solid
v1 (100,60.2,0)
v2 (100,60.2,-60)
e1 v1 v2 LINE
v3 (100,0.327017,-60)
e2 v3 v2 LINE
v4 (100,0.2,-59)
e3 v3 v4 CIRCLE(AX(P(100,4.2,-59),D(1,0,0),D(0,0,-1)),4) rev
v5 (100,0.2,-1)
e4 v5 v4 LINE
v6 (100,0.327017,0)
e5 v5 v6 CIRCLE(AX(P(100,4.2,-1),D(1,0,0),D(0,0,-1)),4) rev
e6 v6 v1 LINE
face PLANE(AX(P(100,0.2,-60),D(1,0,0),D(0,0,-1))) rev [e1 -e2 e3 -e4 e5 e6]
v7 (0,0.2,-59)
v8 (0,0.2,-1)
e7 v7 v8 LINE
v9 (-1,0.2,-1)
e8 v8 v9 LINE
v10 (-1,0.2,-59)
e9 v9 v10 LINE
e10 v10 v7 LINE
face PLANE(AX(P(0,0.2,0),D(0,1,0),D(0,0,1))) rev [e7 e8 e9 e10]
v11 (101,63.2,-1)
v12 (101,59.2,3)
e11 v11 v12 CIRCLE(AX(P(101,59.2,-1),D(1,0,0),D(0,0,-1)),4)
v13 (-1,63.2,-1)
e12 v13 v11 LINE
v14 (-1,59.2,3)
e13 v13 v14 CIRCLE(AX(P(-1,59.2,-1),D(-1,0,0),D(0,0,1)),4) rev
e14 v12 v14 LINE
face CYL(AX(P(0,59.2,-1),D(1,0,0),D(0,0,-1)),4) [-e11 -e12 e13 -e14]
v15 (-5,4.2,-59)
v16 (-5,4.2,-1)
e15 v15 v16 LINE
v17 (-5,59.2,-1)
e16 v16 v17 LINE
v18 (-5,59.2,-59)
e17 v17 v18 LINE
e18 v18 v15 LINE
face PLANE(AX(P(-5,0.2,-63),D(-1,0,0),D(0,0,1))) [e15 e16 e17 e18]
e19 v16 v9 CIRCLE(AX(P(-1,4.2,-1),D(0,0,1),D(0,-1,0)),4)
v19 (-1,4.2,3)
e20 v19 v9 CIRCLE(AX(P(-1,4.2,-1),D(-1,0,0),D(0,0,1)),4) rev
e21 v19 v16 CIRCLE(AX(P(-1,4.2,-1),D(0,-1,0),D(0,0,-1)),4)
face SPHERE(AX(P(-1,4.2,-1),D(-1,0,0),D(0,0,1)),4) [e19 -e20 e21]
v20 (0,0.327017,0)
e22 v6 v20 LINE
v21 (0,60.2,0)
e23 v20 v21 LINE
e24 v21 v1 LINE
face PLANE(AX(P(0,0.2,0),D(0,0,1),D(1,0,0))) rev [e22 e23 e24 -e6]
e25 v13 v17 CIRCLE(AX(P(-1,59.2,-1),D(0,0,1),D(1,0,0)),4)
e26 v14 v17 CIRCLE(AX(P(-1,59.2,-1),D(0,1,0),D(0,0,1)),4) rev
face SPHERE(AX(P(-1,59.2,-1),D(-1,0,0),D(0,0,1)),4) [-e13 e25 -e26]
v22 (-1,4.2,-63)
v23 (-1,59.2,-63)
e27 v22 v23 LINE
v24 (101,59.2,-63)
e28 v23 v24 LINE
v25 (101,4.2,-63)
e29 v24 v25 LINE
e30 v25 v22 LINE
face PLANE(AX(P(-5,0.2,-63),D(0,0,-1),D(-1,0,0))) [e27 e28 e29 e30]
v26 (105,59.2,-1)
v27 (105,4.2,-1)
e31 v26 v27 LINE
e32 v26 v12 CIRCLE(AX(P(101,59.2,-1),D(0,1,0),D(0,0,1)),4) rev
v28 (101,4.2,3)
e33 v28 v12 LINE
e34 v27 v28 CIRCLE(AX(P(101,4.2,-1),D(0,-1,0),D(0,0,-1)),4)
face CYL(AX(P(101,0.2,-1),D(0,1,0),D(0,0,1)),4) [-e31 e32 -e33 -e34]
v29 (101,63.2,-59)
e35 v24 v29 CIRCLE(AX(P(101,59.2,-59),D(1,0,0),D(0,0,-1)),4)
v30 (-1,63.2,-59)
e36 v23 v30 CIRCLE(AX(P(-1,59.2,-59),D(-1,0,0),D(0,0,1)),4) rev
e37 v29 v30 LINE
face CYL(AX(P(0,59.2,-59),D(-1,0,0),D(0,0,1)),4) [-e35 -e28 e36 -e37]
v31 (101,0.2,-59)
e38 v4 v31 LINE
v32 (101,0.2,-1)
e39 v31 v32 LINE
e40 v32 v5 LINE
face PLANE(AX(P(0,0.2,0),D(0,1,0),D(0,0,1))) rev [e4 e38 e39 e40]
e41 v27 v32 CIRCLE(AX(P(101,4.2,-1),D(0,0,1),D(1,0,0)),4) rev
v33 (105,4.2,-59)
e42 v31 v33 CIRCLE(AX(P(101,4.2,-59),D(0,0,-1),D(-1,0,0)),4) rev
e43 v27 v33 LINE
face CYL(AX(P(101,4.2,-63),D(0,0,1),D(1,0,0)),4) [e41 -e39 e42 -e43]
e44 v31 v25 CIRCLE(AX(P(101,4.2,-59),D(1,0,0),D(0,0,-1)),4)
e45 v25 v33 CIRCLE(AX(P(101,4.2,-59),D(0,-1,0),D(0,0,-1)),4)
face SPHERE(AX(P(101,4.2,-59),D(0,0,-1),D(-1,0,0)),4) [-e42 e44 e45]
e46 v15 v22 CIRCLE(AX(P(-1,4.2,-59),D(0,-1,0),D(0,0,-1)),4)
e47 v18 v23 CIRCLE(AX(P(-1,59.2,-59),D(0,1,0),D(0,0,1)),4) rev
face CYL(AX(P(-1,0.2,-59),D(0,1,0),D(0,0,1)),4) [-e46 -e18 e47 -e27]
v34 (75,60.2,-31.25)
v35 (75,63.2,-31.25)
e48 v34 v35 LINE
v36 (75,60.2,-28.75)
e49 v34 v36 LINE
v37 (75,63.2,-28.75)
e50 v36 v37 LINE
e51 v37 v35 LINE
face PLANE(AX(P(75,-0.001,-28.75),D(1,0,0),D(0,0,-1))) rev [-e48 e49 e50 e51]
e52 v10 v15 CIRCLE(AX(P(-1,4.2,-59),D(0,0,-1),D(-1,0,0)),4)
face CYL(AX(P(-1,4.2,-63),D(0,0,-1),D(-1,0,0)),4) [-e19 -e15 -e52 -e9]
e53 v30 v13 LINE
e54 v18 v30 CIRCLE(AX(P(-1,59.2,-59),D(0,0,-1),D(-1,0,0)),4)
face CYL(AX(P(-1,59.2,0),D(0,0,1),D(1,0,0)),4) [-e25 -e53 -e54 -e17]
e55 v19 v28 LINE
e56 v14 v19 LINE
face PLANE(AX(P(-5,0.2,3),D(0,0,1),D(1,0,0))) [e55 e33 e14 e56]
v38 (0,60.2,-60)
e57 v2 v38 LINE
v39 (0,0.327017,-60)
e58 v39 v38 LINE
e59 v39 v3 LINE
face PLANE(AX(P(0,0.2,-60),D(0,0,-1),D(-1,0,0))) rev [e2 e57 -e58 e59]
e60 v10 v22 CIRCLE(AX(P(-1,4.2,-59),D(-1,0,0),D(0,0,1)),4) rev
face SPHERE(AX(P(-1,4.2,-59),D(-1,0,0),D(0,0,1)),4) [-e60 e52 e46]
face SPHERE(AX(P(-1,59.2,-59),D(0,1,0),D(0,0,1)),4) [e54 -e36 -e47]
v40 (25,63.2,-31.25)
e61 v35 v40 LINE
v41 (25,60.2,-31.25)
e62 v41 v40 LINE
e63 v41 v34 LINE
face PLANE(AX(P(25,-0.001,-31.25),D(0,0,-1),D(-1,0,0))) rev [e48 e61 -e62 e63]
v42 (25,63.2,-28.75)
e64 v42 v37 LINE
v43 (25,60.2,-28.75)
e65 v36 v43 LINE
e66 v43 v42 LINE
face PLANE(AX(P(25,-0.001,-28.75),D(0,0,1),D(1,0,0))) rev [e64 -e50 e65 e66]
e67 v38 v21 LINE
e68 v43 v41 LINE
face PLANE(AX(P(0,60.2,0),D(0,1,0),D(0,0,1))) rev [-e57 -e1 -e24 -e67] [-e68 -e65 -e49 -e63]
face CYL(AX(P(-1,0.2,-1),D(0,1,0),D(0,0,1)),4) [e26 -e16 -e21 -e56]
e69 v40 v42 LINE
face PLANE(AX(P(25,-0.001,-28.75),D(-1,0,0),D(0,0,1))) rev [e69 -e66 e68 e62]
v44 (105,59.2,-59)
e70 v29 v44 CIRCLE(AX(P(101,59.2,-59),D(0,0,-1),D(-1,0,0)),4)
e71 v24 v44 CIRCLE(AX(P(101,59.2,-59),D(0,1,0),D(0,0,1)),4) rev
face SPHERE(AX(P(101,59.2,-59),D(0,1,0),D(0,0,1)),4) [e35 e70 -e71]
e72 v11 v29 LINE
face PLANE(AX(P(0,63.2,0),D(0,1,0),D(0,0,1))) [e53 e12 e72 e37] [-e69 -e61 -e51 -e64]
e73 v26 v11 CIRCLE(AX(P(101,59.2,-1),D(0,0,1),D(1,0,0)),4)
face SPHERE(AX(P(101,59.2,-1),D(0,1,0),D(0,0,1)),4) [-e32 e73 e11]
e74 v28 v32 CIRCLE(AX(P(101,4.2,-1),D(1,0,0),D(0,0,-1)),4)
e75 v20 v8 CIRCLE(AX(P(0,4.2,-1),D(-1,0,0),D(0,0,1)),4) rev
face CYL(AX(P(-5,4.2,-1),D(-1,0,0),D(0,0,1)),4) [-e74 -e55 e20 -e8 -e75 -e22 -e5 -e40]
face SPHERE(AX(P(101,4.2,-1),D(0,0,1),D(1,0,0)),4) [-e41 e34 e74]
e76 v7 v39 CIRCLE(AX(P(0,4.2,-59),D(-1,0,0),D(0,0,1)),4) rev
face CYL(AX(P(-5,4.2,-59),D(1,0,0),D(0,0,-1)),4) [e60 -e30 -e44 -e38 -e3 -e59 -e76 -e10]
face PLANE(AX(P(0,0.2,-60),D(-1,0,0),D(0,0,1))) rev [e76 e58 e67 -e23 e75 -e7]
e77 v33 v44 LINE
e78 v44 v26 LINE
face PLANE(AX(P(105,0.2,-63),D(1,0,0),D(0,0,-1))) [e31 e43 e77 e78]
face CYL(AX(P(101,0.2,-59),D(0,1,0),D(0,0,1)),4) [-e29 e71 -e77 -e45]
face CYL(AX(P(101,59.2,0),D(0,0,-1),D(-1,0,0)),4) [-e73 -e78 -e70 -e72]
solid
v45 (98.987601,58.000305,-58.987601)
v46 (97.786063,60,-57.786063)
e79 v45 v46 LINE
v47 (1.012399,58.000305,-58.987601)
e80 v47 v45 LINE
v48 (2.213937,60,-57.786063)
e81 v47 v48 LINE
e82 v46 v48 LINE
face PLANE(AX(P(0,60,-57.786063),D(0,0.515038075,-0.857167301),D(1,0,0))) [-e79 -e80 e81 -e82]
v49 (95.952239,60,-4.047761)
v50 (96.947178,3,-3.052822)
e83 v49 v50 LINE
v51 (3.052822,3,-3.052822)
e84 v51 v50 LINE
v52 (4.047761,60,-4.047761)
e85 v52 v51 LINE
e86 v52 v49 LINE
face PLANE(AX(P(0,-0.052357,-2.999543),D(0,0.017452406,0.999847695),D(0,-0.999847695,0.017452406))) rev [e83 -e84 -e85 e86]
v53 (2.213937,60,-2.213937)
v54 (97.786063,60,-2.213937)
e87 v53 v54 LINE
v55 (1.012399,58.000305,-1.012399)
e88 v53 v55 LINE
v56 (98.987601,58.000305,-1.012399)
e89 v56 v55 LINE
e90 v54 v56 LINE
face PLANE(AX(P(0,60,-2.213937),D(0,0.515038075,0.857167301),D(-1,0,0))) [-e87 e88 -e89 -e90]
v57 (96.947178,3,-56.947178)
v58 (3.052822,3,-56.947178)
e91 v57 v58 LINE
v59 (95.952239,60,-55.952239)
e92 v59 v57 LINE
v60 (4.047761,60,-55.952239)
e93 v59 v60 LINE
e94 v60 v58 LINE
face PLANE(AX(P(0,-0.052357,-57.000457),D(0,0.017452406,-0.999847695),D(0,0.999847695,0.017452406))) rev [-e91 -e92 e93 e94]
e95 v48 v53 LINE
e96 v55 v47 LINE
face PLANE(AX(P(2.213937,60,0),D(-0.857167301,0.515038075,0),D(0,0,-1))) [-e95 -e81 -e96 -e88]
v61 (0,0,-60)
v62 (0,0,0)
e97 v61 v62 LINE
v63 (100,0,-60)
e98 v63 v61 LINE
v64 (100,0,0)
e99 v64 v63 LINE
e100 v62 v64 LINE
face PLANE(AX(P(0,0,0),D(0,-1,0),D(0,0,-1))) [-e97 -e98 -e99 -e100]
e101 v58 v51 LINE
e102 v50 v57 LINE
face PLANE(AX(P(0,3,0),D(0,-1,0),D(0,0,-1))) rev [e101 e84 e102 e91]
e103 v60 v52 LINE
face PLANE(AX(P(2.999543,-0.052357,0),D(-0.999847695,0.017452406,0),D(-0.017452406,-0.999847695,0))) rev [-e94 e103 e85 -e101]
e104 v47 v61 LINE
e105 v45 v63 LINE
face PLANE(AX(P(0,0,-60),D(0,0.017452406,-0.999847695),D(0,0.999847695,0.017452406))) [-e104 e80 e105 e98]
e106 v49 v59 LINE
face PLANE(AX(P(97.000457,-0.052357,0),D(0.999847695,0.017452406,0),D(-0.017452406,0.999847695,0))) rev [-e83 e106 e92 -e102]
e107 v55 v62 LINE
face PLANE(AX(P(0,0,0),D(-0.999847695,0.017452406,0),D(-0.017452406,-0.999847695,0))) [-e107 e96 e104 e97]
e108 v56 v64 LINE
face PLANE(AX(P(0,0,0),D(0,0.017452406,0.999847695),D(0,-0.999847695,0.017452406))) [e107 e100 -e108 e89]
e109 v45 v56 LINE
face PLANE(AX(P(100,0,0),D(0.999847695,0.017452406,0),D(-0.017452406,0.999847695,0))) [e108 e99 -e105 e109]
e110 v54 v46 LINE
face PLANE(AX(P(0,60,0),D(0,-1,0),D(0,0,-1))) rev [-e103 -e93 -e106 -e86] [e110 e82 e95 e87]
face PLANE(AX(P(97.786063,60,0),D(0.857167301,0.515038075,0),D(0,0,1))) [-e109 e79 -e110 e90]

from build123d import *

# Parameters (mm, degrees)
SKETCH1_W           = 100
SKETCH1_H           = 60
BOSS_EXTRUDE1_DEPTH = 60
BOSS_EXTRUDE1_TAPER = 1
SHELL1_T            = -3
CHAMFER1_SIZE       = 2
CHAMFER1_SIZE_2     = 1.166633397
SKETCH2_W           = 100
SKETCH2_H           = 60
BOSS_EXTRUDE2_DEPTH = 3
SKETCH3_W           = 110
SKETCH3_H           = 66
SKETCH3_W_2         = 100
SKETCH3_H_2         = 60
BOSS_EXTRUDE3_DEPTH = 63
SKETCH4_W           = 50
SKETCH4_H           = 2.5
CUT_EXTRUDE1_DEPTH  = 3
FILLET1_R           = 4


with BuildPart() as part:
    # Sketch1 → Boss-Extrude1 (new body)
    with BuildSketch(Plane(origin=(0, 0, 0), x_dir=(1, 0, 0), z_dir=(0, 1, 0))):
        with Locations((50, 30)):
            Rectangle(SKETCH1_W, SKETCH1_H)
    extrude(amount=BOSS_EXTRUDE1_DEPTH, taper=BOSS_EXTRUDE1_TAPER)

    # Shell1
    shell1_openings = [part.faces().sort_by_distance(p)[0] for p in [
        (50, 60, -30),
    ]]
    offset(amount=SHELL1_T, openings=shell1_openings, kind=Kind.INTERSECTION)

    # Chamfer1
    # the kernel refuses this chamfer: 2, 1.166633397 mm, written as the material it takes off along each edge
    with BuildSketch(Plane(origin=(98.952696104, 60, 4.126867614), x_dir=(0.03677296874035604, -0.9993236456574119, 0), z_dir=(0, 0, -1)), Plane(origin=(1.047303896, 60, -64.126867614), x_dir=(-0.036772968740354815, -0.9993236456574122, 0), z_dir=(0, 0, 1))) as chamfer1_piece_1:
        Polygon((CHAMFER1_SIZE * 0.999813220622, CHAMFER1_SIZE * 0.0193267656127), (-CHAMFER1_SIZE_2 * 0.0367729687471, CHAMFER1_SIZE_2 * 0.999323645842), (0, 0), align=None)
    extrude(amount=68.253735227, mode=Mode.SUBTRACT)
    with BuildSketch(Plane(origin=(104.126867614, 60, -58.952696104), x_dir=(0, -0.9993236456574122, -0.036772968740352616), z_dir=(-1, 0, 0)), Plane(origin=(-4.126867614, 60, -1.047303896), x_dir=(0, -0.9993236456574119, 0.03677296874035481), z_dir=(1, 0, 0))) as chamfer1_piece_2:
        Polygon((CHAMFER1_SIZE * 0.999813220622, CHAMFER1_SIZE * 0.0193267656127), (-CHAMFER1_SIZE_2 * 0.0367729687471, CHAMFER1_SIZE_2 * 0.999323645842), (0, 0), align=None)
    extrude(amount=108.253735227, mode=Mode.SUBTRACT)


with BuildPart() as body_2:
    # Sketch2 → Boss-Extrude2 (new body)
    with BuildSketch(Plane(origin=(0, 60.2, 0), x_dir=(1, 0, 0), z_dir=(0, 1, 0))):
        with Locations((50, 30)):
            Rectangle(SKETCH2_W, SKETCH2_H)
    extrude(amount=BOSS_EXTRUDE2_DEPTH)


with BuildPart() as body_3:
    # Sketch3 → Boss-Extrude3 (new body)
    with BuildSketch(Plane(origin=(0, 63.2, 0), x_dir=(1, 0, 0), z_dir=(0, 1, 0))):
        with Locations((50, 30)):
            Rectangle(SKETCH3_W, SKETCH3_H)
        with Locations((50, 30)):
            Rectangle(SKETCH3_W_2, SKETCH3_H_2, mode=Mode.SUBTRACT)
    extrude(amount=-BOSS_EXTRUDE3_DEPTH)


with BuildPart() as body_2_1:
    add(body_2.part)

    # Combine1: union body 3
    add(body_3.part)

    # Sketch4 → Cut-Extrude1 (cut)
    with BuildSketch(Plane(origin=(0, 63.2, 0), x_dir=(1, 0, 0), z_dir=(0, 1, 0))):
        with Locations((50, 30)):
            Rectangle(SKETCH4_W, SKETCH4_H)
    extrude(amount=-CUT_EXTRUDE1_DEPTH, mode=Mode.SUBTRACT)

    # Fillet1
    # the kernel refuses this fillet: 4 mm, written as the material it takes off along each edge
    with BuildSketch(Plane(origin=(101, 4.2, -59), x_dir=(0, 0, -1), z_dir=(0, -1, 0))) as fillet1_piece_1_section:
        Polygon((0, 0), (FILLET1_R, 0), (FILLET1_R, FILLET1_R), (0, FILLET1_R), align=None)
    fillet1_piece_1 = extrude(amount=FILLET1_R, mode=Mode.PRIVATE)
    fillet1_piece_1 = fillet1_piece_1 - Plane(origin=(101, 4.2, -59), x_dir=(-0.7071067811865475, 0, 0.7071067811865475), z_dir=(0, -1, 0)) * Sphere(FILLET1_R, mode=Mode.PRIVATE)
    add(fillet1_piece_1, mode=Mode.SUBTRACT)
    with BuildSketch(Plane(origin=(101, 4.2, -1), x_dir=(1, 0, 0), z_dir=(0, -1, 0))) as fillet1_piece_2_section:
        Polygon((0, 0), (FILLET1_R, 0), (FILLET1_R, FILLET1_R), (0, FILLET1_R), align=None)
    fillet1_piece_2 = extrude(amount=FILLET1_R, mode=Mode.PRIVATE)
    fillet1_piece_2 = fillet1_piece_2 - Plane(origin=(101, 4.2, -1), x_dir=(-0.7071067811865475, 0, -0.7071067811865475), z_dir=(0, -1, 0)) * Sphere(FILLET1_R, mode=Mode.PRIVATE)
    add(fillet1_piece_2, mode=Mode.SUBTRACT)
    with BuildSketch(Plane(origin=(101, 59.2, -59), x_dir=(0, 0, -1), z_dir=(0, 1, 0))) as fillet1_piece_3_section:
        Polygon((0, 0), (FILLET1_R, 0), (FILLET1_R, -FILLET1_R), (0, -FILLET1_R), align=None)
    fillet1_piece_3 = extrude(amount=FILLET1_R, mode=Mode.PRIVATE)
    fillet1_piece_3 = fillet1_piece_3 - Plane(origin=(101, 59.2, -59), x_dir=(-0.7071067811865475, 0, 0.7071067811865475), z_dir=(0, 1, 0)) * Sphere(FILLET1_R, mode=Mode.PRIVATE)
    add(fillet1_piece_3, mode=Mode.SUBTRACT)
    with BuildSketch(Plane(origin=(101, 59.2, -1), x_dir=(1, 0, 0), z_dir=(0, 1, 0))) as fillet1_piece_4_section:
        Polygon((0, 0), (FILLET1_R, 0), (FILLET1_R, -FILLET1_R), (0, -FILLET1_R), align=None)
    fillet1_piece_4 = extrude(amount=FILLET1_R, mode=Mode.PRIVATE)
    fillet1_piece_4 = fillet1_piece_4 - Plane(origin=(101, 59.2, -1), x_dir=(-0.7071067811865475, 0, -0.7071067811865475), z_dir=(0, 1, 0)) * Sphere(FILLET1_R, mode=Mode.PRIVATE)
    add(fillet1_piece_4, mode=Mode.SUBTRACT)
    with BuildSketch(Plane(origin=(-1, 4.2, -1), x_dir=(0, 0, 1), z_dir=(0, -1, 0))) as fillet1_piece_5_section:
        Polygon((0, 0), (FILLET1_R, 0), (FILLET1_R, FILLET1_R), (0, FILLET1_R), align=None)
    fillet1_piece_5 = extrude(amount=FILLET1_R, mode=Mode.PRIVATE)
    fillet1_piece_5 = fillet1_piece_5 - Plane(origin=(-1, 4.2, -1), x_dir=(0.7071067811865475, 0, -0.7071067811865475), z_dir=(0, -1, 0)) * Sphere(FILLET1_R, mode=Mode.PRIVATE)
    add(fillet1_piece_5, mode=Mode.SUBTRACT)
    with BuildSketch(Plane(origin=(-1, 59.2, -1), x_dir=(0, 0, 1), z_dir=(0, 1, 0))) as fillet1_piece_6_section:
        Polygon((0, 0), (FILLET1_R, 0), (FILLET1_R, -FILLET1_R), (0, -FILLET1_R), align=None)
    fillet1_piece_6 = extrude(amount=FILLET1_R, mode=Mode.PRIVATE)
    fillet1_piece_6 = fillet1_piece_6 - Plane(origin=(-1, 59.2, -1), x_dir=(0.7071067811865475, 0, -0.7071067811865475), z_dir=(0, 1, 0)) * Sphere(FILLET1_R, mode=Mode.PRIVATE)
    add(fillet1_piece_6, mode=Mode.SUBTRACT)
    with BuildSketch(Plane(origin=(-1, 4.2, -59), x_dir=(0, 0, -1), z_dir=(0, -1, 0))) as fillet1_piece_7_section:
        Polygon((0, 0), (FILLET1_R, 0), (FILLET1_R, -FILLET1_R), (0, -FILLET1_R), align=None)
    fillet1_piece_7 = extrude(amount=FILLET1_R, mode=Mode.PRIVATE)
    fillet1_piece_7 = fillet1_piece_7 - Plane(origin=(-1, 4.2, -59), x_dir=(0.7071067811865475, 0, 0.7071067811865475), z_dir=(0, -1, 0)) * Sphere(FILLET1_R, mode=Mode.PRIVATE)
    add(fillet1_piece_7, mode=Mode.SUBTRACT)
    with BuildSketch(Plane(origin=(-1, 59.2, -59), x_dir=(0, 0, -1), z_dir=(0, 1, 0))) as fillet1_piece_8_section:
        Polygon((0, 0), (FILLET1_R, 0), (FILLET1_R, FILLET1_R), (0, FILLET1_R), align=None)
    fillet1_piece_8 = extrude(amount=FILLET1_R, mode=Mode.PRIVATE)
    fillet1_piece_8 = fillet1_piece_8 - Plane(origin=(-1, 59.2, -59), x_dir=(0.7071067811865475, 0, 0.7071067811865475), z_dir=(0, 1, 0)) * Sphere(FILLET1_R, mode=Mode.PRIVATE)
    add(fillet1_piece_8, mode=Mode.SUBTRACT)
    with BuildSketch(Plane(origin=(105, 0.2, -59), x_dir=(-1, 0, 0), z_dir=(0, 0, 1)), Plane(origin=(-5, 0.2, -1), x_dir=(1, 0, 0), z_dir=(0, 0, -1))) as fillet1_piece_9:
        with BuildLine():
            CenterArc((FILLET1_R, -FILLET1_R), FILLET1_R, 90, 90)
            Line((0, -FILLET1_R), (0, 0))
            Line((0, 0), (FILLET1_R, 0))
        make_face()
    extrude(amount=58, mode=Mode.SUBTRACT)
    with BuildSketch(Plane(origin=(105, 63.2, -59), x_dir=(-1, 0, 0), z_dir=(0, 0, 1)), Plane(origin=(-5, 63.2, -1), x_dir=(1, 0, 0), z_dir=(0, 0, -1))) as fillet1_piece_10:
        with BuildLine():
            CenterArc((FILLET1_R, FILLET1_R), FILLET1_R, 180, 90)
            Line((0, FILLET1_R), (0, 0))
            Line((0, 0), (FILLET1_R, 0))
        make_face()
    extrude(amount=58, mode=Mode.SUBTRACT)
    with BuildSketch(Plane(origin=(105, 59.2, 3), x_dir=(0, 0, -1), z_dir=(0, -1, 0)), Plane(origin=(105, 59.2, -63), x_dir=(-1, 0, 0), z_dir=(0, -1, 0)), Plane(origin=(-5, 59.2, 3), x_dir=(1, 0, 0), z_dir=(0, -1, 0))) as fillet1_piece_11:
        with BuildLine():
            CenterArc((FILLET1_R, -FILLET1_R), FILLET1_R, 90, 90)
            Line((0, -FILLET1_R), (0, 0))
            Line((0, 0), (FILLET1_R, 0))
        make_face()
    extrude(amount=55, mode=Mode.SUBTRACT)
    with BuildSketch(Plane(origin=(101, 0.2, 3), x_dir=(0, 0, -1), z_dir=(-1, 0, 0)), Plane(origin=(-1, 0.2, -63), x_dir=(0, 0, 1), z_dir=(1, 0, 0))) as fillet1_piece_12:
        with BuildLine():
            CenterArc((FILLET1_R, -FILLET1_R), FILLET1_R, 90, 90)
            Line((0, -FILLET1_R), (0, 0))
            Line((0, 0), (FILLET1_R, 0))
        make_face()
    extrude(amount=102, mode=Mode.SUBTRACT)
    with BuildSketch(Plane(origin=(101, 63.2, 3), x_dir=(0, 0, -1), z_dir=(-1, 0, 0)), Plane(origin=(-1, 63.2, -63), x_dir=(0, 0, 1), z_dir=(1, 0, 0))) as fillet1_piece_13:
        with BuildLine():
            CenterArc((FILLET1_R, FILLET1_R), FILLET1_R, 180, 90)
            Line((0, FILLET1_R), (0, 0))
            Line((0, 0), (FILLET1_R, 0))
        make_face()
    extrude(amount=102, mode=Mode.SUBTRACT)
    with BuildSketch(Plane(origin=(-5, 59.2, -63), x_dir=(1, 0, 0), z_dir=(0, -1, 0))) as fillet1_piece_14:
        with BuildLine():
            CenterArc((FILLET1_R, FILLET1_R), FILLET1_R, 180, 90)
            Line((0, FILLET1_R), (0, 0))
            Line((0, 0), (FILLET1_R, 0))
        make_face()
    extrude(amount=55, mode=Mode.SUBTRACT)


solid = Compound([part.part, body_2_1.part])
